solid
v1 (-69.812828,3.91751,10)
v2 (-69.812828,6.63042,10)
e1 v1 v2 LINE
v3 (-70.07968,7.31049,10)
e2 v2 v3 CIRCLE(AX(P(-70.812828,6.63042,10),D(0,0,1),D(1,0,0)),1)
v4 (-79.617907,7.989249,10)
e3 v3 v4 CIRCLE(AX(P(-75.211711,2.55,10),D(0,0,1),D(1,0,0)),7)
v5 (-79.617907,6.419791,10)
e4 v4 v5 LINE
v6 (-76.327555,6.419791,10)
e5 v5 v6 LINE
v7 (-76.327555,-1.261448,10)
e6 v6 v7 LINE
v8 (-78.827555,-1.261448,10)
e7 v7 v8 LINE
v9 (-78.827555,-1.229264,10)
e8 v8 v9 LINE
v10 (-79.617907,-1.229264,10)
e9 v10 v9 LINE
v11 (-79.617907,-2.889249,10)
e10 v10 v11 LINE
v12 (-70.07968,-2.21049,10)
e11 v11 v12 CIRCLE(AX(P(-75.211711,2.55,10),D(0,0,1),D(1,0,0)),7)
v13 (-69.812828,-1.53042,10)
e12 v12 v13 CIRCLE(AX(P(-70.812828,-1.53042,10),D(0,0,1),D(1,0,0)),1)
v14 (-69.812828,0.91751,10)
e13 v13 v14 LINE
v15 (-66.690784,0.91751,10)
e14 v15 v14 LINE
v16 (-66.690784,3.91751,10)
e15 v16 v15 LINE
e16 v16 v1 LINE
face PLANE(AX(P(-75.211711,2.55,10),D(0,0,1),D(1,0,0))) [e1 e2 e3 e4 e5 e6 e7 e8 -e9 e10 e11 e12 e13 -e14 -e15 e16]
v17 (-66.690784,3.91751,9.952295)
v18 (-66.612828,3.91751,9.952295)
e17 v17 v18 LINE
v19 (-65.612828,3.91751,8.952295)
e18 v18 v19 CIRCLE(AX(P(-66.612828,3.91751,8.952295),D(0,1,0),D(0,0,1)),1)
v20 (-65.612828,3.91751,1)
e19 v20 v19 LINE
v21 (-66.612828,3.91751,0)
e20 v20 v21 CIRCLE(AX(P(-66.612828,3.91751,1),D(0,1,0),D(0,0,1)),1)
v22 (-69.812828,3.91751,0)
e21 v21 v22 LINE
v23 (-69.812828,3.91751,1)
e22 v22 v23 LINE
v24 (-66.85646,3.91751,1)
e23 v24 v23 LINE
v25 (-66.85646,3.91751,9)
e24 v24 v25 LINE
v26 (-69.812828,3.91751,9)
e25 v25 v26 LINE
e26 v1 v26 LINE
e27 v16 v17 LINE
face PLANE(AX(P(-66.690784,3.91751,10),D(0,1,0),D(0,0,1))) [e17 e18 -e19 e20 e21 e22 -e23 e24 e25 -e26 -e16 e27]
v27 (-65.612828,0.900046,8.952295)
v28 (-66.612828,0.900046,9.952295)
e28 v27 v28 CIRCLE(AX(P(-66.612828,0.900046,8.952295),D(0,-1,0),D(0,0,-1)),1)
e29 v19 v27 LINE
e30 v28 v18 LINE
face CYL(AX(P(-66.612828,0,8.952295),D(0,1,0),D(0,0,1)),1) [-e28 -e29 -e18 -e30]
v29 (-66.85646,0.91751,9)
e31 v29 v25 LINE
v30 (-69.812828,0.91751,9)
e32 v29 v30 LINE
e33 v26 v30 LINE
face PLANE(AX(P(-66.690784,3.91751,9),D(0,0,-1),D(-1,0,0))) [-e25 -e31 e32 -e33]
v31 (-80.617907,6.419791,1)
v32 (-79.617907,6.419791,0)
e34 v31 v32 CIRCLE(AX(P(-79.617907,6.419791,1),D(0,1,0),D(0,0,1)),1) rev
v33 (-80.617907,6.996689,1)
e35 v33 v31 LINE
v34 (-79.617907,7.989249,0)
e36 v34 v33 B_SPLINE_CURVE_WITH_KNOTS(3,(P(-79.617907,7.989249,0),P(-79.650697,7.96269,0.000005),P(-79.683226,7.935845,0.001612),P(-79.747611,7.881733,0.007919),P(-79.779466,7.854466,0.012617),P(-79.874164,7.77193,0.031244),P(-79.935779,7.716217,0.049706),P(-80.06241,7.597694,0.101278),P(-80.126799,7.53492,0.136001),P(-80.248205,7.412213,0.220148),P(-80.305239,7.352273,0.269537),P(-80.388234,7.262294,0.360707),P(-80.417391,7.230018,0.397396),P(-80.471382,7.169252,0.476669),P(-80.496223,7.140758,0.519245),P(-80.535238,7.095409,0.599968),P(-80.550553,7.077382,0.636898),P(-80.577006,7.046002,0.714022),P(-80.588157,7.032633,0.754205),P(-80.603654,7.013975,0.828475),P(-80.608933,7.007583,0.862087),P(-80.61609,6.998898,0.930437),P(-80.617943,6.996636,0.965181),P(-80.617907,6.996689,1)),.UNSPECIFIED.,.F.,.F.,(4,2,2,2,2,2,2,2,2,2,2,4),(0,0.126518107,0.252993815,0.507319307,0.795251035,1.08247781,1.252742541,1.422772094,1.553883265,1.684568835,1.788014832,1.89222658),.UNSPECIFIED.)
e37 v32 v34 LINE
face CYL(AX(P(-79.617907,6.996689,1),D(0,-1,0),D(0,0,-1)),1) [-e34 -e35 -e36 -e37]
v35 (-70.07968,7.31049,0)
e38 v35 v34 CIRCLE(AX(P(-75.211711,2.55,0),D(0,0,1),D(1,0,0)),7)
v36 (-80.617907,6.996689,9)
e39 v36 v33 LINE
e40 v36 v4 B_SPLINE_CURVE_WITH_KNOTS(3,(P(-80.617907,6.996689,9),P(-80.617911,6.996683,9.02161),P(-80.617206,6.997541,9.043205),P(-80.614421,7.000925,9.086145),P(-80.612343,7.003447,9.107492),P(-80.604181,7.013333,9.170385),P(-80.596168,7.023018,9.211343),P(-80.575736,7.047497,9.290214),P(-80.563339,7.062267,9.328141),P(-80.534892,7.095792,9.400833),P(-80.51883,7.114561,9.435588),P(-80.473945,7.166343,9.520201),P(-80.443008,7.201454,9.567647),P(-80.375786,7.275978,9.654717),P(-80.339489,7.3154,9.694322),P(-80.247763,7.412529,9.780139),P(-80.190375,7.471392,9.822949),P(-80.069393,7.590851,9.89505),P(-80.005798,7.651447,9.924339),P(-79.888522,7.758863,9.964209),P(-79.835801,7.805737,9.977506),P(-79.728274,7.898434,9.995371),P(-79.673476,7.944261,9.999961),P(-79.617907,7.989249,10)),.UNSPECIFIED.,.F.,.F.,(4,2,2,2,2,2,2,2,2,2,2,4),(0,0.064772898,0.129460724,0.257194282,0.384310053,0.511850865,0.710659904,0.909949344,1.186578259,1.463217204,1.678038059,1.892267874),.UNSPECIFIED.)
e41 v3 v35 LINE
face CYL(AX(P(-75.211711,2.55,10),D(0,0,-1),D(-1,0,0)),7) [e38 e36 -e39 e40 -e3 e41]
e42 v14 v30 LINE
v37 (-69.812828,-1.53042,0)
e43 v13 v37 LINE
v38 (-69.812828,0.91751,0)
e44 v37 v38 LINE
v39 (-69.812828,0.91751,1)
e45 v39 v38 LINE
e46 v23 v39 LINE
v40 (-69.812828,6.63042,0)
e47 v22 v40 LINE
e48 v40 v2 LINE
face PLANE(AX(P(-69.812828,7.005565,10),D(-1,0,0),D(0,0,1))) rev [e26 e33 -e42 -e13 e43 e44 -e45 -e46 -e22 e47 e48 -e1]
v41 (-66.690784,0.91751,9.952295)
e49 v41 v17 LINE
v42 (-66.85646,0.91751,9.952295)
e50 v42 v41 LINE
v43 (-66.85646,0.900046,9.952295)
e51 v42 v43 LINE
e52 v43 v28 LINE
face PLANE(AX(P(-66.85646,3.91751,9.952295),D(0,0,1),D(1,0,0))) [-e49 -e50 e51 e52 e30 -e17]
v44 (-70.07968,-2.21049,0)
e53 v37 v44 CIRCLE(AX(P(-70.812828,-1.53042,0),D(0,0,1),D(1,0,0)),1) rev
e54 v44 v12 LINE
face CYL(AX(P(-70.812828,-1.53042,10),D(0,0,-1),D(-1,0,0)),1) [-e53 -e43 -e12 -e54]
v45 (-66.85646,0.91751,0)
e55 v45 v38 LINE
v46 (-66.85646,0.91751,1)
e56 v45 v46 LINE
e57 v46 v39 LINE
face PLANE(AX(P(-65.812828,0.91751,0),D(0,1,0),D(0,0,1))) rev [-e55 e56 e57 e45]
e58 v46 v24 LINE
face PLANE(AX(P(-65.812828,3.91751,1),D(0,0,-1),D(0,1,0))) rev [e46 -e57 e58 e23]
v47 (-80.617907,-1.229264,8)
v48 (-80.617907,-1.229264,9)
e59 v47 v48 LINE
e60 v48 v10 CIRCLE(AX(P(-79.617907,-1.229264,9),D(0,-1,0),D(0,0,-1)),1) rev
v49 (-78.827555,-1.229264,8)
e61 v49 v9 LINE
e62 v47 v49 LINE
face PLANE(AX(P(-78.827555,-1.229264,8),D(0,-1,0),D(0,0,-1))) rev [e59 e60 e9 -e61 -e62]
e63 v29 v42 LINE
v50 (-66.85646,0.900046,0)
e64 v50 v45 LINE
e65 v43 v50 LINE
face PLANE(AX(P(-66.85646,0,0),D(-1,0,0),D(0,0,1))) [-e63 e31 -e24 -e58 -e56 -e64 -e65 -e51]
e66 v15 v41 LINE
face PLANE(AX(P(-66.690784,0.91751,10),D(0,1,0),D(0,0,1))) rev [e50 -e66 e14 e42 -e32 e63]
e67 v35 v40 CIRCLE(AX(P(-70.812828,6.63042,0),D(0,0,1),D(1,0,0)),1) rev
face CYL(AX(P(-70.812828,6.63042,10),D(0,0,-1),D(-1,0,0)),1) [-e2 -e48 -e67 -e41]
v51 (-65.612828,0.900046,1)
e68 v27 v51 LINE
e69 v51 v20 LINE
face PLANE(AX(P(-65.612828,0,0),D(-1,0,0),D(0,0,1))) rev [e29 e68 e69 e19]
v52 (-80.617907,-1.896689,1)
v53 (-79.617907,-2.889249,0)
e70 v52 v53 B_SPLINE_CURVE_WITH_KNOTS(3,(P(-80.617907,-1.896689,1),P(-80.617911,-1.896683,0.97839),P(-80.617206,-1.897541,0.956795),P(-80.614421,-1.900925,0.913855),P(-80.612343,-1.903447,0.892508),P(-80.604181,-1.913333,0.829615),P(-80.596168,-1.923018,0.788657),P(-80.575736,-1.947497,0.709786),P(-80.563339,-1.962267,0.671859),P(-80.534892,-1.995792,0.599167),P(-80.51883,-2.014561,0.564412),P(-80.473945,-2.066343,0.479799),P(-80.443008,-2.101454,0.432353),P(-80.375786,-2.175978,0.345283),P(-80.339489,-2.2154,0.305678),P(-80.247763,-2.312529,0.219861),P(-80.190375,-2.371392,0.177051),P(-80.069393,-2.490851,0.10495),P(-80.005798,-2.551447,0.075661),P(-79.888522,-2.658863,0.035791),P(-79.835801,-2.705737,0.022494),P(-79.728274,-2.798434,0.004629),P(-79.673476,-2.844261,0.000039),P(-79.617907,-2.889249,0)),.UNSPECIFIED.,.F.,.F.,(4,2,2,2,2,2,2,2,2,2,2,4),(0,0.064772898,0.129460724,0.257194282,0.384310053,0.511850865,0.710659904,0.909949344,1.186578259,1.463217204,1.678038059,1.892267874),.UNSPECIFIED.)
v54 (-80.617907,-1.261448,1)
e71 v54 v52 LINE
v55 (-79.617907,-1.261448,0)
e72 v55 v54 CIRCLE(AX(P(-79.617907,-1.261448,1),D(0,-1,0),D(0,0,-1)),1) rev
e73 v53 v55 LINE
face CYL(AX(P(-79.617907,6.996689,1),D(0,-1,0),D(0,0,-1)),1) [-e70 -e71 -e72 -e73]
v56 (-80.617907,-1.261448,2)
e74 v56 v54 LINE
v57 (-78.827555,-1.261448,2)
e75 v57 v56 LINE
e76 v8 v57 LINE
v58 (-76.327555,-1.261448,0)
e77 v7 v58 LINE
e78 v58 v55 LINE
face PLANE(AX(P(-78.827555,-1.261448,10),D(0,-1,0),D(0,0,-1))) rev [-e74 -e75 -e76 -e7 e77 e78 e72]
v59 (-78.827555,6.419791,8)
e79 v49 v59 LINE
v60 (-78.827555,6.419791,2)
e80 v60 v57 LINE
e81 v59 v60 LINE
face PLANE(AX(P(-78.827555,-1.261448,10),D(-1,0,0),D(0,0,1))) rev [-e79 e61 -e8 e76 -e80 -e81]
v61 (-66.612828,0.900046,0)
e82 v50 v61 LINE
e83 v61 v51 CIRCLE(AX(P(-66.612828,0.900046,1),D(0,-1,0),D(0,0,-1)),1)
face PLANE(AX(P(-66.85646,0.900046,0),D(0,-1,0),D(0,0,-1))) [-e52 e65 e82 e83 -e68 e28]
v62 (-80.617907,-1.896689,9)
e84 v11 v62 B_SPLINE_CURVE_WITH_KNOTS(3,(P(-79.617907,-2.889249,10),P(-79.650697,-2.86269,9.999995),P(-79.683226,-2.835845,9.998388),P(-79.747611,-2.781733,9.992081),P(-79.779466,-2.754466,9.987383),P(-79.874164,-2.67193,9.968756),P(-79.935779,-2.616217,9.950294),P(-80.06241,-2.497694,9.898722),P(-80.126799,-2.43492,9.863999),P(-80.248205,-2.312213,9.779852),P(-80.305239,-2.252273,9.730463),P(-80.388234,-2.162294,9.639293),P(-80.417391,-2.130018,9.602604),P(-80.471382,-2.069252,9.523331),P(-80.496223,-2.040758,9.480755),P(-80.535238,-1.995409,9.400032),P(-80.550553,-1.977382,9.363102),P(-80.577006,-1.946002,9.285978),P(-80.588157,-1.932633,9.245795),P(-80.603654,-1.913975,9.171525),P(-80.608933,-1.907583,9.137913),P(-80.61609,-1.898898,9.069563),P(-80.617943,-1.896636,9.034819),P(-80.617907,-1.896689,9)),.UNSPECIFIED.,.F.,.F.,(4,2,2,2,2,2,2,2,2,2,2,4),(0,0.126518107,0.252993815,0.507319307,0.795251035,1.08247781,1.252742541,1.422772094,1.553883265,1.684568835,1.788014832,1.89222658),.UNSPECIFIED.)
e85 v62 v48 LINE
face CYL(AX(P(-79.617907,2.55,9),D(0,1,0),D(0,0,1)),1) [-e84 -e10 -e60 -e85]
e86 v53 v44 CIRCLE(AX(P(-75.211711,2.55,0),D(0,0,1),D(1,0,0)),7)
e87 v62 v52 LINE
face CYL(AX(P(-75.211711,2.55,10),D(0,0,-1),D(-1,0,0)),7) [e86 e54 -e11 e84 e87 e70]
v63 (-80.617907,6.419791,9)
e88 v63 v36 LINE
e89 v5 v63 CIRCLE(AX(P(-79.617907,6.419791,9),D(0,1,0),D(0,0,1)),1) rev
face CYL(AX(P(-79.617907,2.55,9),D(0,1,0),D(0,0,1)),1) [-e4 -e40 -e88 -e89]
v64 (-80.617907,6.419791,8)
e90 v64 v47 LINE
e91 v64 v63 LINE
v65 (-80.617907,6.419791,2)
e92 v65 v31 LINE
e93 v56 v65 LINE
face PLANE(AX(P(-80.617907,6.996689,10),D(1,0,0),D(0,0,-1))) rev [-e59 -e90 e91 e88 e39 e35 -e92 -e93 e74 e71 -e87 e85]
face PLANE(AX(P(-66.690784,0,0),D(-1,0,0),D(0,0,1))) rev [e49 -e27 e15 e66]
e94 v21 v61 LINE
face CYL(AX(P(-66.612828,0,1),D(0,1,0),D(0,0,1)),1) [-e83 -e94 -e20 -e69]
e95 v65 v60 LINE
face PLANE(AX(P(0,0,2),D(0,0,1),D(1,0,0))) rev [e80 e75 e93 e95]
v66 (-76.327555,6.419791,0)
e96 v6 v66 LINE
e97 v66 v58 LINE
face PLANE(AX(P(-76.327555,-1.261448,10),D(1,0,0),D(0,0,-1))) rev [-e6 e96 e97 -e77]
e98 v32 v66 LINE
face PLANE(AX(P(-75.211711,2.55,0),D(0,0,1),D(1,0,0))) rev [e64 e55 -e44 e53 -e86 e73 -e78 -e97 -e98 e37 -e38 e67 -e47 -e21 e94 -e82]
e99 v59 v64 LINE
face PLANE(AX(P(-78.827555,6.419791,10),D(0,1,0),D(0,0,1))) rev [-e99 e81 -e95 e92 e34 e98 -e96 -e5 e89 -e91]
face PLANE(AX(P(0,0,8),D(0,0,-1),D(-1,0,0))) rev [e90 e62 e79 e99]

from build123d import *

# Parameters (mm, degrees)
SKETCH_1_R            = 7
EXTRUDE_1_DEPTH       = 10
SKETCH_9_W            = 7.120641766
SKETCH_9_H            = 4.534999238
EXTRUDE_6_DEPTH       = 1
SKETCH_11_W           = 1.257653538
SKETCH_11_H           = 9
EXTRUDE_7_DEPTH       = 4.5
EXTRUDE_8_DEPTH       = 6
FILLET_8_R            = 1
FILLET_9_R            = 1
CUT_EXTRUDE_1_DEPTH   = 10
SKETCH_14_W           = 1
SKETCH_14_H           = 3
EXTRUDE_9_DEPTH       = 3.122043073
SKETCH_15_W           = 1
SKETCH_15_H           = 3
EXTRUDE_10_DEPTH      = 4
EXTRUDE_11_DEPTH      = 0.2
EXTRUDE_11_DEPTH_BACK = 1.043632387
SKETCH_16_W           = 9.952294967
SKETCH_16_H           = 3.01746433
FILLET_11_R           = 1
FILLET_12_R           = 1
FILLET_13_R           = 1
FILLET_14_R           = 1
CUT_EXTRUDE_2_DEPTH   = 10
SKETCH_18_W           = 2.5
SKETCH_18_H           = 7.68123899
CUT_EXTRUDE_3_DEPTH   = 10
SKETCH_19_W           = 1.790352256
SKETCH_19_H           = 7.68123899
CUT_EXTRUDE_4_DEPTH   = 2
SKETCH_20_W           = 1.790352256
SKETCH_20_H           = 7.649055087
CUT_EXTRUDE_5_DEPTH   = 2
FILLET_15_R           = 1
FILLET_16_R           = 1
FILLET_17_R           = 1
FILLET_18_R           = 1


with BuildPart() as part:
    # 草圖1 → 填料-伸長1 (new body)
    with BuildSketch(Plane(origin=(0.382706605, 0, 0), x_dir=(1, 0, 0), z_dir=(0, 0, 1))):
        with Locations((-75.594417438, 2.55)):
            Circle(SKETCH_1_R)
    extrude(amount=EXTRUDE_1_DEPTH)

    # 草圖9 → 填料-伸長6 (add)
    with BuildSketch(Plane(origin=(6.127831546, 0, 9), x_dir=(1, 0, 0), z_dir=(0, 0, 1))):
        with Locations((-75.644850643, 2.267499619)):
            Rectangle(SKETCH_9_W, SKETCH_9_H)
    extrude(amount=EXTRUDE_6_DEPTH)



with BuildPart() as body_2:
    # 草圖11 → 填料-伸長7 (new body)
    with BuildSketch(Plane(origin=(9.574526933, 4.534999238, 0.48426017), x_dir=(1, 0, 0), z_dir=(0, 1, 0))):
        with Locations((-76.184774061, -4.5)):
            Rectangle(SKETCH_11_W, SKETCH_11_H)
    extrude(amount=-EXTRUDE_7_DEPTH)


with BuildPart() as part_1:
    add(part.part)

    add(body_2.part)  # 填料-伸長8 merges body 2
    # 草圖12 → 填料-伸長8 (add)
    with BuildSketch(Plane.ZY.offset(67.239073897)):
        Polygon((0.48426017, 4.534999238), (0.48426017, 0), (1.483647509, 0.034999238), (1.483647509, 4.534999238), align=None)
    extrude(amount=EXTRUDE_8_DEPTH)

    # 圓角8
    fillet_8_edges = [part_1.edges().sort_by_distance(p)[0] for p in [
        (-65.981420359, 2.284999238, 0.48426017),
    ]]
    fillet(fillet_8_edges, radius=FILLET_8_R)

    # 圓角9
    fillet_9_edges = [part_1.edges().sort_by_distance(p)[0] for p in [
        (-65.956698214, 2.267499619, 10),
    ]]
    fillet(fillet_9_edges, radius=FILLET_9_R - 0.0001)  # a hair under: the kernel refuses the full size

    # 草圖13 → 除料-伸長1 (cut)
    with BuildSketch(Plane(origin=(0, 0, 0), x_dir=(-1, 0, 0), z_dir=(0, 0, -1))):
        with BuildLine():
            Line((69.812827514, 7.005564937), (69.812827514, -1.905564937))
            ThreePointArc((69.812827514, -1.905564937), (67.081734981, 2.55), (69.812827514, 7.005564937))
        make_face()
    extrude(amount=-CUT_EXTRUDE_1_DEPTH, mode=Mode.SUBTRACT)


with BuildPart() as cut_extrude_1_kept_piece:
    # of the separate pieces the step leaves, the one the design keeps (cut_extrude_1_pieces_kept)
    add(part_1.part.solids().sort_by_distance((-69.812827514, 7.005564937, 10))[0])

    # 草圖14 → 填料-伸長9 (add)
    with BuildSketch(Plane(origin=(-69.812827514, 0, 0), x_dir=(0, 0, -1), z_dir=(1, 0, 0))):
        with Locations((-9.5, 2.417510407)):
            Rectangle(SKETCH_14_W, SKETCH_14_H)
    extrude(amount=EXTRUDE_9_DEPTH)

    # 草圖15 → 填料-伸長10 (add)
    with BuildSketch(Plane(origin=(-69.812827514, 0, 0), x_dir=(0, 0, -1), z_dir=(1, 0, 0))):
        with Locations((-0.5, 2.417510407)):
            Rectangle(SKETCH_15_W, SKETCH_15_H)
    extrude(amount=EXTRUDE_10_DEPTH)

    # 草圖16 → 填料-伸長11 (add, two sides: drawn at the far end of the back side and taken through both)
    with BuildSketch(Plane(origin=(-65.812827514, 0, 0), x_dir=(0, 0, -1), z_dir=(1, 0, 0)).offset(-EXTRUDE_11_DEPTH_BACK)):
        with Locations((-4.976147484, 2.408778242)):
            Rectangle(SKETCH_16_W, SKETCH_16_H)
    extrude(amount=EXTRUDE_11_DEPTH + EXTRUDE_11_DEPTH_BACK)

    # 圓角11
    fillet_11_edges = [cut_extrude_1_kept_piece.edges().sort_by_distance(p)[0] for p in [
        (-65.612827514, 2.408778242, 0),
    ]]
    fillet(fillet_11_edges, radius=FILLET_11_R)

    # 圓角12
    fillet_12_edges = [cut_extrude_1_kept_piece.edges().sort_by_distance(p)[0] for p in [
        (-65.612827514, 2.408778242, 9.952294967),
    ]]
    fillet(fillet_12_edges, radius=FILLET_12_R)

    # 圓角13
    fillet_13_edges = [cut_extrude_1_kept_piece.edges().sort_by_distance(p)[0] for p in [
        (-69.812827514, 7.005564937, 5),
    ]]
    fillet(fillet_13_edges, radius=FILLET_13_R)

    # 圓角14
    fillet_14_edges = [cut_extrude_1_kept_piece.edges().sort_by_distance(p)[0] for p in [
        (-69.812827514, -1.905564937, 5),
    ]]
    fillet(fillet_14_edges, radius=FILLET_14_R)

    # 草圖17 → 除料-伸長2 (cut)
    with BuildSketch(Plane(origin=(0, 0, 0), x_dir=(-1, 0, 0), z_dir=(0, 0, -1))):
        with BuildLine():
            Line((80.617907093, 6.99668888), (80.617907093, -1.89668888))
            ThreePointArc((80.617907093, -1.89668888), (82.589637241, 2.55), (80.617907093, 6.99668888))
        make_face()
    extrude(amount=-CUT_EXTRUDE_2_DEPTH, mode=Mode.SUBTRACT)

    # 草圖18 → 除料-伸長3 (cut)
    with BuildSketch(Plane(origin=(0, 0, 0), x_dir=(-1, 0, 0), z_dir=(0, 0, -1))):
        with Locations((77.577554837, 2.579171883)):
            Rectangle(SKETCH_18_W, SKETCH_18_H)
    extrude(amount=-CUT_EXTRUDE_3_DEPTH, mode=Mode.SUBTRACT)

    # 草圖19 → 除料-伸長4 (cut)
    with BuildSketch(Plane(origin=(0, 0, 0), x_dir=(-1, 0, 0), z_dir=(0, 0, -1))):
        with Locations((79.722730965, 2.579171883)):
            Rectangle(SKETCH_19_W, SKETCH_19_H)
    extrude(amount=-CUT_EXTRUDE_4_DEPTH, mode=Mode.SUBTRACT)

    # 草圖20 → 除料-伸長5 (cut)
    with BuildSketch(Plane.XY.offset(10)):
        with Locations((-79.722730965, 2.595263834)):
            Rectangle(SKETCH_20_W, SKETCH_20_H)
    extrude(amount=-CUT_EXTRUDE_5_DEPTH, mode=Mode.SUBTRACT)

    # 圓角15
    fillet_15_edges = [cut_extrude_1_kept_piece.edges().sort_by_distance(p)[0] for p in [
        (-80.617907093, 6.708240129, 0),
    ]]
    fillet(fillet_15_edges, radius=FILLET_15_R)

    # 圓角16
    fillet_16_edges = [cut_extrude_1_kept_piece.edges().sort_by_distance(p)[0] for p in [
        (-80.617907093, 6.708240129, 10),
    ]]
    fillet(fillet_16_edges, radius=FILLET_16_R)

    # 圓角17
    fillet_17_edges = [cut_extrude_1_kept_piece.edges().sort_by_distance(p)[0] for p in [
        (-80.617907093, -1.579068246, 0),
    ]]
    fillet(fillet_17_edges, radius=FILLET_17_R)

    # 圓角18
    fillet_18_edges = [cut_extrude_1_kept_piece.edges().sort_by_distance(p)[0] for p in [
        (-80.617907093, -1.562976295, 10),
    ]]
    fillet(fillet_18_edges, radius=FILLET_18_R)


solid = cut_extrude_1_kept_piece.part
